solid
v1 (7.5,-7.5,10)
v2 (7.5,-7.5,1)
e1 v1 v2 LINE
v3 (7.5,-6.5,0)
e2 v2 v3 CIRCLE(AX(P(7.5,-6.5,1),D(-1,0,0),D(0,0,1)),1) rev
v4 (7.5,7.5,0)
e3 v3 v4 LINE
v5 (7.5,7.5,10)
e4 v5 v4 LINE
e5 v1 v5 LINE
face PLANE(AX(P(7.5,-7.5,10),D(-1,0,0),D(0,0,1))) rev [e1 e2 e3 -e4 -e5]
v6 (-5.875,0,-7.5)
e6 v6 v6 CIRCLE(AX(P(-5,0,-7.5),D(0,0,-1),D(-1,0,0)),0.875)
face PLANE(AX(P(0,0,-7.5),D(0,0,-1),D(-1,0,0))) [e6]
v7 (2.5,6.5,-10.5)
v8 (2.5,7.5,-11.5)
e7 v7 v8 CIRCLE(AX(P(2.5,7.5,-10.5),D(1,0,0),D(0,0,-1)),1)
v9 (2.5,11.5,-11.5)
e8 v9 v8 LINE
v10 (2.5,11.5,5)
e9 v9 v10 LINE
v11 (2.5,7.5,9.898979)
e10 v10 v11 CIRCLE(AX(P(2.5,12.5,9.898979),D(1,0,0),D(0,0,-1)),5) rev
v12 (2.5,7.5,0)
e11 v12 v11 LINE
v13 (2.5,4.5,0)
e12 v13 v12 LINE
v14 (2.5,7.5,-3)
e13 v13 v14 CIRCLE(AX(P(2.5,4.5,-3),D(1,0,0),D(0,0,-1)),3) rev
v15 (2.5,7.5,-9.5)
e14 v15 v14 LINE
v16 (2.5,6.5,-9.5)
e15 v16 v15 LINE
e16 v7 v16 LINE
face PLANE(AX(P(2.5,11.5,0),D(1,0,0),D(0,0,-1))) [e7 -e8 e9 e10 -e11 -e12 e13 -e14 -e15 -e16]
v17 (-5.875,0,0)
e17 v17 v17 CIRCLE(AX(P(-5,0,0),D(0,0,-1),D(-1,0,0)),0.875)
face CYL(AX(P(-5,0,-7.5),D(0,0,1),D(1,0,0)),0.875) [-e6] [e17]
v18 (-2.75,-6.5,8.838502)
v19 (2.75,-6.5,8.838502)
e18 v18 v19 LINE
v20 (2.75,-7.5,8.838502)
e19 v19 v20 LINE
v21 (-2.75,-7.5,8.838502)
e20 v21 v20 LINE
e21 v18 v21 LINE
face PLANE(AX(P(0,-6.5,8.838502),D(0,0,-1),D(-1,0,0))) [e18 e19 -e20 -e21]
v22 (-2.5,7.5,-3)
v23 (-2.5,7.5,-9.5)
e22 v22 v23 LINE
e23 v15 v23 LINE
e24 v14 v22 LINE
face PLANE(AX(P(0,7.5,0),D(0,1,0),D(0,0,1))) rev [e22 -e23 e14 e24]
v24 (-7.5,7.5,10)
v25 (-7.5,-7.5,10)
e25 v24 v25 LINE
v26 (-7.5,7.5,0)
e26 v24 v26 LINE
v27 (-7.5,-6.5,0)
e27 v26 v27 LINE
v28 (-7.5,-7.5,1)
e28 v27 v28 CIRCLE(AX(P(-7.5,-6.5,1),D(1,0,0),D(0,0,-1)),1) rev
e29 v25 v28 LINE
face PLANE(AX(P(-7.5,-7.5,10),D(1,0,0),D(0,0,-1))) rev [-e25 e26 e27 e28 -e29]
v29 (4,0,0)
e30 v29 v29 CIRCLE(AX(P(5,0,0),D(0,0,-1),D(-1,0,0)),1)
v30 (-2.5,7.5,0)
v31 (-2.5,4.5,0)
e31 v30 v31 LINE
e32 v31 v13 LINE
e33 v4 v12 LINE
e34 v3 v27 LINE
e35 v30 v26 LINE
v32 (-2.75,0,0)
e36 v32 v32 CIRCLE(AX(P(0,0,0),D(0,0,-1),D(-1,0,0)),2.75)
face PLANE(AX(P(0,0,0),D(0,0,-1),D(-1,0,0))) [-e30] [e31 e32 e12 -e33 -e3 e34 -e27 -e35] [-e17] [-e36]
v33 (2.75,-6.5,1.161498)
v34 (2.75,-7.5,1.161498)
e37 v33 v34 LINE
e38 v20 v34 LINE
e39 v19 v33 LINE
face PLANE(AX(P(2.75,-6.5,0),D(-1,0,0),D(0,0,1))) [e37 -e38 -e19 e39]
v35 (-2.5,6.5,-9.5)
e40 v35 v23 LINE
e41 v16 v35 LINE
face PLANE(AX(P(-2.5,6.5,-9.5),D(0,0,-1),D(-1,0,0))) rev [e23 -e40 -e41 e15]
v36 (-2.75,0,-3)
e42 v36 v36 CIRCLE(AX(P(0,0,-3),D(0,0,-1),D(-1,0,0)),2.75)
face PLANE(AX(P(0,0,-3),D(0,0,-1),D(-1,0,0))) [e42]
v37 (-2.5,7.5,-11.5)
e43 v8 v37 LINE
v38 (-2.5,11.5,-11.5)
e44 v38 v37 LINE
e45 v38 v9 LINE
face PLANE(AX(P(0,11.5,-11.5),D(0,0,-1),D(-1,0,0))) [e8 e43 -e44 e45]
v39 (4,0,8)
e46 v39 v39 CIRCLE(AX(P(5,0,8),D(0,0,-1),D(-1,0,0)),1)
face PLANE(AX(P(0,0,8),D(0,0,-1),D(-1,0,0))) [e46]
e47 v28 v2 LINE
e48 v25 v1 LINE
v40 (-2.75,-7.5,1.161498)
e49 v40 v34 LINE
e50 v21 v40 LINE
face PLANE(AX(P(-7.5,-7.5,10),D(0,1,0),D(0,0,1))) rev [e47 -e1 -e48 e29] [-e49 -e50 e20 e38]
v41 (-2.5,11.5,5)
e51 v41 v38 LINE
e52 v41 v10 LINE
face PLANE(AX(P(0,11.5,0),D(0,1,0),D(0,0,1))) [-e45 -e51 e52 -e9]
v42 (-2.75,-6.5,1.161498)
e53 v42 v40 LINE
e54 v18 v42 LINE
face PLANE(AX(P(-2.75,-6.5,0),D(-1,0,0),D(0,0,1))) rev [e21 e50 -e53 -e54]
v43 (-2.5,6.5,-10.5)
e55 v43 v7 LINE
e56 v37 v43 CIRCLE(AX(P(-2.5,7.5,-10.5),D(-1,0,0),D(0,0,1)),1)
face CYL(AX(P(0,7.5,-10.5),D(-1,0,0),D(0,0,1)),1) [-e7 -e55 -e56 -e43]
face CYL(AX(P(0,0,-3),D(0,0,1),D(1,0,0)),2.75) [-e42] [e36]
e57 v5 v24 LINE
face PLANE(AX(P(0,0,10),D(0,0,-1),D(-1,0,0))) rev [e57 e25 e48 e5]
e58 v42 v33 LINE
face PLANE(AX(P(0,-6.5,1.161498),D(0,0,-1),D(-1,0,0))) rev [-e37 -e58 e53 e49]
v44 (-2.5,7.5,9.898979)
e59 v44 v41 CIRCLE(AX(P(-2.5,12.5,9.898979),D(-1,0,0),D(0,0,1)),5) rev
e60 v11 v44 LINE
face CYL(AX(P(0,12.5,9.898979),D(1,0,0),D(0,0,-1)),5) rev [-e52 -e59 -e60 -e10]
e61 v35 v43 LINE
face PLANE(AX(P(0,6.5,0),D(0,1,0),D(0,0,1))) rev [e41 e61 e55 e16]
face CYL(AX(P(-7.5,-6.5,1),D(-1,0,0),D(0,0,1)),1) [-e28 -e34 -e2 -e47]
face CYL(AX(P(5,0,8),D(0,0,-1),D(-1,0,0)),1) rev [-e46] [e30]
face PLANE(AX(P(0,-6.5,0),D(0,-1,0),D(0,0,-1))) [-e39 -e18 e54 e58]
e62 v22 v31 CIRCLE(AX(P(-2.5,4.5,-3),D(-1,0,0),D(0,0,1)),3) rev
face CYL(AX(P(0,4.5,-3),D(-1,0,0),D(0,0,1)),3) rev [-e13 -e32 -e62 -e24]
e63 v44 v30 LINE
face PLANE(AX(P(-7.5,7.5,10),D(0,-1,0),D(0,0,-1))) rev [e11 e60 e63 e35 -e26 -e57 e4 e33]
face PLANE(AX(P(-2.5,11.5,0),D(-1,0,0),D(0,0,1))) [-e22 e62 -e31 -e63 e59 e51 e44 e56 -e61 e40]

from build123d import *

# Parameters (mm, degrees)
SKETCH1_W           = 15
SKETCH1_H           = 15
BOSS_EXTRUDE1_DEPTH = 10
SKETCH2_R           = 2.75
BOSS_EXTRUDE2_DEPTH = 3
SKETCH3_W           = 2.5
SKETCH3_H           = 5
BOSS_EXTRUDE3_DEPTH = 4
FILLET1_R           = 5
FILLET2_R           = 3
SKETCH4_W           = 5
SKETCH4_H           = 2
BOSS_EXTRUDE4_DEPTH = 1
FILLET3_R           = 1
SKETCH5_W           = 2.75
SKETCH5_H           = 7.677004104
CUT_EXTRUDE1_DEPTH  = 1
SKETCH6_R           = 1
CUT_EXTRUDE2_DEPTH  = 8
SKETCH7_R           = 0.875
BOSS_EXTRUDE5_DEPTH = 7.5
FILLET5_R           = 1


with BuildPart() as part:
    # Sketch1 → Boss-Extrude1 (new body)
    with BuildSketch(Plane.XY):
        Rectangle(SKETCH1_W, SKETCH1_H)
    extrude(amount=BOSS_EXTRUDE1_DEPTH)

    # Sketch2 → Boss-Extrude2 (add)
    with BuildSketch(Plane(origin=(0, 0, 0), x_dir=(-1, 0, 0), z_dir=(0, 0, -1))):
        Circle(SKETCH2_R)
    extrude(amount=BOSS_EXTRUDE2_DEPTH)

    # Sketch3 → Boss-Extrude3 (add)
    with BuildSketch(Plane(origin=(0, 7.5, 0), x_dir=(1, 0, 0), z_dir=(0, 1, 0))):
        Polygon((-2.5, 0), (0, 0), (2.5, 0), (2.5, 11.5), (-2.5, 11.5), align=None)
        with Locations((1.25, -2.5)):
            Rectangle(SKETCH3_W, SKETCH3_H)
        with Locations((-1.25, -2.5)):
            Rectangle(SKETCH3_W, SKETCH3_H)
    extrude(amount=BOSS_EXTRUDE3_DEPTH)

    # Fillet1
    # the kernel refuses this fillet: 5 mm, written as the material it adds along each edge
    with BuildSketch(Plane(origin=(2.5, 7.5, 5), x_dir=(0, 0, 1), z_dir=(-1, 0, 0))) as fillet1_piece_1:
        with BuildLine():
            CenterArc((4.898979486, 5), FILLET1_R, 191.536959033, 78.463040967)
            Line((0, 4), (-0.09797959, 3.98))
            ThreePointArc((-0.09797959, 3.98), (-0.1, 2), (-0.1, 0))
            Line((-0.1, 0), (0, -0.1))
            Line((0, -0.1), (4.898979486, -0.1))
            Line((4.898979486, -0.1), (4.898979486, 0))
        make_face()
    extrude(amount=5)

    # Fillet2
    fillet2_edges = [part.edges().sort_by_distance(p)[0] for p in [
        (0, 7.5, 0),
    ]]
    fillet(fillet2_edges, radius=FILLET2_R)

    # Sketch4 → Boss-Extrude4 (add)
    with BuildSketch(Plane.XZ.offset(-7.5)):
        with Locations((0, -10.5)):
            Rectangle(SKETCH4_W, SKETCH4_H)
    extrude(amount=BOSS_EXTRUDE4_DEPTH)

    # Fillet3
    fillet3_edges = [part.edges().sort_by_distance(p)[0] for p in [
        (0, 6.5, -11.5),
    ]]
    fillet(fillet3_edges, radius=FILLET3_R)

    # Sketch5 → Cut-Extrude1 (cut)
    with BuildSketch(Plane.XZ.offset(7.5)):
        with Locations((-1.375, 5)):
            Rectangle(SKETCH5_W, SKETCH5_H)
        with Locations((1.375, 5)):
            Rectangle(SKETCH5_W, SKETCH5_H)
    extrude(amount=-CUT_EXTRUDE1_DEPTH, mode=Mode.SUBTRACT)

    # Sketch6 → Cut-Extrude2 (cut)
    with BuildSketch(Plane(origin=(0, 0, 0), x_dir=(-1, 0, 0), z_dir=(0, 0, -1))):
        with Locations((-5, 0)):
            Circle(SKETCH6_R)
    extrude(amount=-CUT_EXTRUDE2_DEPTH, mode=Mode.SUBTRACT)

    # Sketch7 → Boss-Extrude5 (add)
    with BuildSketch(Plane(origin=(0, 0, 0), x_dir=(-1, 0, 0), z_dir=(0, 0, -1))):
        with Locations((5, 0)):
            Circle(SKETCH7_R)
    extrude(amount=BOSS_EXTRUDE5_DEPTH)

    # Fillet5
    fillet5_edges = [part.edges().sort_by_distance(p)[0] for p in [
        (0, -7.5, 0),
    ]]
    fillet(fillet5_edges, radius=FILLET5_R)


solid = part.part
